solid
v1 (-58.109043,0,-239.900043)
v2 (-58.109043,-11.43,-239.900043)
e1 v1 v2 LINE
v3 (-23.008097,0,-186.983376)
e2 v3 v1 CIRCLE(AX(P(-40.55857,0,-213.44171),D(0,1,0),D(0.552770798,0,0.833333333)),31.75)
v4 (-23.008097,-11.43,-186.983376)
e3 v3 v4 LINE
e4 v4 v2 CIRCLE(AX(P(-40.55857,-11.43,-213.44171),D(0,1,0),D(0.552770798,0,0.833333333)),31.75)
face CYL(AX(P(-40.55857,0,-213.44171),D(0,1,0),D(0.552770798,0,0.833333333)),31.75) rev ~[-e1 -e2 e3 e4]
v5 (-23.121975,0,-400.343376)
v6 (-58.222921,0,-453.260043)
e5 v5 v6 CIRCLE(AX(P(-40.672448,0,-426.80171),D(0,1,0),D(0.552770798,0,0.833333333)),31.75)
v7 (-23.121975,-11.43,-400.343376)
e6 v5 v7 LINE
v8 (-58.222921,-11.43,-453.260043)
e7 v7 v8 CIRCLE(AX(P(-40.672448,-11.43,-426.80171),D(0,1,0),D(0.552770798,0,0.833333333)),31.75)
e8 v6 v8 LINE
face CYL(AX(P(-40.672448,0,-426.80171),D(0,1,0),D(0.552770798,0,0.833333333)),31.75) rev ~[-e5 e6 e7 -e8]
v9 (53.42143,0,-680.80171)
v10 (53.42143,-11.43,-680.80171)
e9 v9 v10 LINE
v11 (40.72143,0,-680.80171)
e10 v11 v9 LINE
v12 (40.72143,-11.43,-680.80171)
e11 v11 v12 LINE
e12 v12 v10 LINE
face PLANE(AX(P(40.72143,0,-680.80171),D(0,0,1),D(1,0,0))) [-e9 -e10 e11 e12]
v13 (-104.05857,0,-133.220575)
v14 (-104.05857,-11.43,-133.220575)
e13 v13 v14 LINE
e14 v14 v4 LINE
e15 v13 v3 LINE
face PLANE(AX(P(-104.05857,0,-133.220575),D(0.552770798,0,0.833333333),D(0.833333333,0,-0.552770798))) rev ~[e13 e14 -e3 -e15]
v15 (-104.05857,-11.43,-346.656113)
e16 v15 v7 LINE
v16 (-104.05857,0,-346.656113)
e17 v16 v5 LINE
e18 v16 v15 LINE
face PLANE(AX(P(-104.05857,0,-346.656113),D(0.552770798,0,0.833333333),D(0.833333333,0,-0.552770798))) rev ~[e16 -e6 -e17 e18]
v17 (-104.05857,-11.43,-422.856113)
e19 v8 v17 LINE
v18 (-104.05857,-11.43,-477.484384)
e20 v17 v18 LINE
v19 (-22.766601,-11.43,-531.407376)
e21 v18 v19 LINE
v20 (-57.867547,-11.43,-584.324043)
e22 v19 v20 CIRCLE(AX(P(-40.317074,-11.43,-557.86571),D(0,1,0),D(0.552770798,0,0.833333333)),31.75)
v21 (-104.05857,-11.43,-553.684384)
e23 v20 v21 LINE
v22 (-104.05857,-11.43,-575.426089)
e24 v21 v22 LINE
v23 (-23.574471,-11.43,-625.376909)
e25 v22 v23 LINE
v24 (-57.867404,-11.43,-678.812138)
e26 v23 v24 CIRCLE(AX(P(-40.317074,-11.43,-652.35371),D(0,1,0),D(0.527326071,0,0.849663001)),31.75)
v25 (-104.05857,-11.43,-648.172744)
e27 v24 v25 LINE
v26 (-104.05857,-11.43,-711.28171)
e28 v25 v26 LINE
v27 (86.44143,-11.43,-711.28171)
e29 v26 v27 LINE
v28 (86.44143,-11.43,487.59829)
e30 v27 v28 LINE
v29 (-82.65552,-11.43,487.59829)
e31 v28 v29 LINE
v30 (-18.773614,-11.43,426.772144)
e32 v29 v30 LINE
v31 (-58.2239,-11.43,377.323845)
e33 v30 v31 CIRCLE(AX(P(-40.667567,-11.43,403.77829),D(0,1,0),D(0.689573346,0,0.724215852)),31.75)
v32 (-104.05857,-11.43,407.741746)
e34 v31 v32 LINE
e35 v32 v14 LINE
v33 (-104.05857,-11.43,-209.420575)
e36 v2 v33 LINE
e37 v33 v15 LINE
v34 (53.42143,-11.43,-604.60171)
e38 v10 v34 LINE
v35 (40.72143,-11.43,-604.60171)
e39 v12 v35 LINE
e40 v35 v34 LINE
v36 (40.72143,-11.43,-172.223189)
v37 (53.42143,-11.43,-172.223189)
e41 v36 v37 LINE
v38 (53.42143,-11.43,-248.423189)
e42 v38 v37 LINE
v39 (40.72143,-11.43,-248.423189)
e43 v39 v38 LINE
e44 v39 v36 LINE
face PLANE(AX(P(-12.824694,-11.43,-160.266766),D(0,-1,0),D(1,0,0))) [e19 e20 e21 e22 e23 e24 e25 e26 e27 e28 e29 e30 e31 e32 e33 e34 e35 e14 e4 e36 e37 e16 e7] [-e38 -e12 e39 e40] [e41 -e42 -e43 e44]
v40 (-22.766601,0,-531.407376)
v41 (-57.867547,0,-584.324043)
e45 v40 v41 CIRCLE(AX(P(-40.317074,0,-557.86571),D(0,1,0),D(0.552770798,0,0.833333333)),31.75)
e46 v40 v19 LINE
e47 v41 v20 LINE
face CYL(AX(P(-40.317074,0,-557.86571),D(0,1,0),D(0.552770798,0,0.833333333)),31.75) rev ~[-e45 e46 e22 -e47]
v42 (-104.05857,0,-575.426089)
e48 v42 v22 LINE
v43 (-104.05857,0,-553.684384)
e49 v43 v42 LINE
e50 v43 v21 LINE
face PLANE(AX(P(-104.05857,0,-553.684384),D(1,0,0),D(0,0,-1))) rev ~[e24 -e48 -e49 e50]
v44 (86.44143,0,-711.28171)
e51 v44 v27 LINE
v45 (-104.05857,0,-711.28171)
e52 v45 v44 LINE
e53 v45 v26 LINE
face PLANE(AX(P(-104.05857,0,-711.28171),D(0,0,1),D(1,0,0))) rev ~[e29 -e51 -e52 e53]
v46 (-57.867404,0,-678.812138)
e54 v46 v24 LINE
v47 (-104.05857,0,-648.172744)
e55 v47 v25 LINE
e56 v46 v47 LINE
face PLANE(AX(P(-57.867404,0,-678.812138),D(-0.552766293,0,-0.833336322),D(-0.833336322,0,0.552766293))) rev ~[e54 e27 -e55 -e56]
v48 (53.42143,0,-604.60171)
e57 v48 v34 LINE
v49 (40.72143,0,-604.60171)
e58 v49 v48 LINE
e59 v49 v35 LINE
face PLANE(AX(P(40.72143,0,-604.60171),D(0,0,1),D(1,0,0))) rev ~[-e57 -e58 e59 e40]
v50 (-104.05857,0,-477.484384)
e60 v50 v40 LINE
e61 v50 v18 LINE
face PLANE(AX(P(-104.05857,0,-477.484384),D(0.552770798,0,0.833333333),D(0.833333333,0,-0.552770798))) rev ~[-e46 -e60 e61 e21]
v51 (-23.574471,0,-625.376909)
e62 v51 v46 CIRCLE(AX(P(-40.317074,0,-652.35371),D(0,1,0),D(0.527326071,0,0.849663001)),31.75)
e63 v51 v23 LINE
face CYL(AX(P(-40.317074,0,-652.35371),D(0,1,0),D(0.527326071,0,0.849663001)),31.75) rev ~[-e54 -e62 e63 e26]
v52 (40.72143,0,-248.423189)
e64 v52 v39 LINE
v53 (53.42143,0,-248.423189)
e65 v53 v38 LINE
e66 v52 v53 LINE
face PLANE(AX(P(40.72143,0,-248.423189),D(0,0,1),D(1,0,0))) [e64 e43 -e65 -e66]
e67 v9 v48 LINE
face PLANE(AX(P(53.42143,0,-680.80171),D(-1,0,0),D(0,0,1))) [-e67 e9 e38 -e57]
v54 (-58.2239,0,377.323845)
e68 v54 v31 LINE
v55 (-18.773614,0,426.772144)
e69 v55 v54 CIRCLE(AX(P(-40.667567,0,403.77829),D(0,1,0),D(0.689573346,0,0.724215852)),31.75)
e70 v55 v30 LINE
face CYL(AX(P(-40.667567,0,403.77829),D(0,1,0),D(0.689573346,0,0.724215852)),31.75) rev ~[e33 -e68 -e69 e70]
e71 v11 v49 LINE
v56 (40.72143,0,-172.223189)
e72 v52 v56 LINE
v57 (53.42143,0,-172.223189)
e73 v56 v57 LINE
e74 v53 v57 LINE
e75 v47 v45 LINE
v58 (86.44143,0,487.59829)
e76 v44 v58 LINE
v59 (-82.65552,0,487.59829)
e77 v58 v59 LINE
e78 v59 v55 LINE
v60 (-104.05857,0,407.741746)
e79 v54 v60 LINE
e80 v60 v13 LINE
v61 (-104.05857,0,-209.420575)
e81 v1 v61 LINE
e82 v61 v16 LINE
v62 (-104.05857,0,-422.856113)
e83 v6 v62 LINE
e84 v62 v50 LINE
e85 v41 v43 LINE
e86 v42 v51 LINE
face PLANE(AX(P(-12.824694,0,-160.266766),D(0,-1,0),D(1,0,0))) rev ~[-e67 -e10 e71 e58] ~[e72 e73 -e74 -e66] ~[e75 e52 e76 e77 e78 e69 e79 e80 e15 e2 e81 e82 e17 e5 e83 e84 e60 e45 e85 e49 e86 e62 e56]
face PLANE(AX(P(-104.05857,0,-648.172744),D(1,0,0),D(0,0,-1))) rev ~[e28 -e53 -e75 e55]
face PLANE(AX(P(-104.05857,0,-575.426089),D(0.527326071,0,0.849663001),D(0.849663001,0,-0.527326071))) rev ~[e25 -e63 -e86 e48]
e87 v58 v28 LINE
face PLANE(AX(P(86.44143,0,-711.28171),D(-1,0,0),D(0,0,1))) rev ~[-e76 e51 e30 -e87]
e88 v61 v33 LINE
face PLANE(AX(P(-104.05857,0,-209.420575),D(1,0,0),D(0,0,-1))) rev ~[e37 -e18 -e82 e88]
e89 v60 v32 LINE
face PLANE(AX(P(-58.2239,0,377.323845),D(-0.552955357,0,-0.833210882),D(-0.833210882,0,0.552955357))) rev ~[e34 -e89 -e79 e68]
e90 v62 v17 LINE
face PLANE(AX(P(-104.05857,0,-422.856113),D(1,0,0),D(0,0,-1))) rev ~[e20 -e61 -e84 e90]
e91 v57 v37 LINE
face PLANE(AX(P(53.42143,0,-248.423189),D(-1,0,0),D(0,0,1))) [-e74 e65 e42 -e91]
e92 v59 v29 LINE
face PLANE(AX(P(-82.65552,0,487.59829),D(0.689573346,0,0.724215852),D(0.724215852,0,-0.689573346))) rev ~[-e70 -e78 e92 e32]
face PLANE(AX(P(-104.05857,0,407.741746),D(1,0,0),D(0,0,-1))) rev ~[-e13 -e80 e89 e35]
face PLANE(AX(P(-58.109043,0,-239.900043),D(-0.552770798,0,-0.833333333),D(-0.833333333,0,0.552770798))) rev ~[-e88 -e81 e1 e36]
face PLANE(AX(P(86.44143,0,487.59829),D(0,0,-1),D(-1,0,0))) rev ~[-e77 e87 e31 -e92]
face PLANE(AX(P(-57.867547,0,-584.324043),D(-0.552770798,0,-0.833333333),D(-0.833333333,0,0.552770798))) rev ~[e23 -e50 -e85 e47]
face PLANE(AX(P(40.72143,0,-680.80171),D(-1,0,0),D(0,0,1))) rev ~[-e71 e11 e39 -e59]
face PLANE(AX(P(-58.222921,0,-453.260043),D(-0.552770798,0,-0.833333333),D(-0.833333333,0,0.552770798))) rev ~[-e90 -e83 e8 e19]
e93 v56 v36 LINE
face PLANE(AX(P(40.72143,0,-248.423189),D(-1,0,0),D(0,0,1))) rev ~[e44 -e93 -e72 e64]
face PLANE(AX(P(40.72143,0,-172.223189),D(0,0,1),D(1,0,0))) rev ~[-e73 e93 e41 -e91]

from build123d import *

# Parameters (mm, degrees)
F0_W     = 12.7
F0_H     = 76.2
F1_DEPTH = 11.43


# Not quite as in the source:
# - a feature names something its author has since deleted; it is built from what else it names


with BuildPart() as f1:
    # F0 (on Front) → F1 (new body)
    with BuildSketch(Plane.XZ):
        with BuildLine():
            Line((86.44143009, 487.5982903777), (-82.6555196025, 487.5982903777))
            Line((-82.6555196025, 487.5982903777), (-18.7736136836, 426.7721436688))
            ThreePointArc((-18.7736136836, 426.7721436688), (-15.8484759418, 383.977401572), (-58.2239000145, 377.323844885))
            Line((-58.2239000145, 377.323844885), (-104.05856991, 407.7417460511))
            Line((-104.05856991, 407.7417460511), (-104.05856991, -133.2205747848))
            Line((-104.05856991, -133.2205747848), (-23.008097061, -186.9833762889))
            ThreePointArc((-23.008097061, -186.9833762889), (-14.1002365767, -230.9921824712), (-58.109042759, -239.9000429556))
            Line((-58.109042759, -239.9000429556), (-104.05856991, -209.4205747848))
            Line((-104.05856991, -209.4205747848), (-104.05856991, -346.656112826))
            Line((-104.05856991, -346.656112826), (-23.121974943, -400.3433762889))
            ThreePointArc((-23.121974943, -400.3433762889), (-14.2141144586, -444.3521824712), (-58.2229206409, -453.2600429556))
            Line((-58.2229206409, -453.2600429556), (-104.05856991, -422.856112826))
            Line((-104.05856991, -422.856112826), (-104.05856991, -477.484384418))
            Line((-104.05856991, -477.484384418), (-22.7666009966, -531.4073762889))
            ThreePointArc((-22.7666009966, -531.4073762889), (-13.8587405122, -575.4161824712), (-57.8675466945, -584.3240429556))
            Line((-57.8675466945, -584.3240429556), (-104.05856991, -553.684384418))
            Line((-104.05856991, -553.684384418), (-104.05856991, -575.4260893394))
            Line((-104.05856991, -575.4260893394), (-23.5744710882, -625.3769093504))
            ThreePointArc((-23.5744710882, -625.3769093504), (-13.5964073743, -669.50213472), (-57.8674036509, -678.8121378395))
            Line((-57.8674036509, -678.8121378395), (-104.05856991, -648.172744022))
            Line((-104.05856991, -648.172744022), (-104.05856991, -711.2817096223))
            Line((-104.05856991, -711.2817096223), (47.07143009, -711.2817096223))
            Line((47.07143009, -711.2817096223), (86.44143009, -711.2817096223))
            Line((86.44143009, -711.2817096223), (86.44143009, 487.5982903777))
        make_face()
        with Locations((47.07143009, -642.7017096223)):
            Rectangle(F0_W, F0_H, mode=Mode.SUBTRACT)
        with Locations((47.07143009, -210.3231889248)):
            Rectangle(F0_W, F0_H, mode=Mode.SUBTRACT)
    extrude(amount=F1_DEPTH)


solid = f1.part
